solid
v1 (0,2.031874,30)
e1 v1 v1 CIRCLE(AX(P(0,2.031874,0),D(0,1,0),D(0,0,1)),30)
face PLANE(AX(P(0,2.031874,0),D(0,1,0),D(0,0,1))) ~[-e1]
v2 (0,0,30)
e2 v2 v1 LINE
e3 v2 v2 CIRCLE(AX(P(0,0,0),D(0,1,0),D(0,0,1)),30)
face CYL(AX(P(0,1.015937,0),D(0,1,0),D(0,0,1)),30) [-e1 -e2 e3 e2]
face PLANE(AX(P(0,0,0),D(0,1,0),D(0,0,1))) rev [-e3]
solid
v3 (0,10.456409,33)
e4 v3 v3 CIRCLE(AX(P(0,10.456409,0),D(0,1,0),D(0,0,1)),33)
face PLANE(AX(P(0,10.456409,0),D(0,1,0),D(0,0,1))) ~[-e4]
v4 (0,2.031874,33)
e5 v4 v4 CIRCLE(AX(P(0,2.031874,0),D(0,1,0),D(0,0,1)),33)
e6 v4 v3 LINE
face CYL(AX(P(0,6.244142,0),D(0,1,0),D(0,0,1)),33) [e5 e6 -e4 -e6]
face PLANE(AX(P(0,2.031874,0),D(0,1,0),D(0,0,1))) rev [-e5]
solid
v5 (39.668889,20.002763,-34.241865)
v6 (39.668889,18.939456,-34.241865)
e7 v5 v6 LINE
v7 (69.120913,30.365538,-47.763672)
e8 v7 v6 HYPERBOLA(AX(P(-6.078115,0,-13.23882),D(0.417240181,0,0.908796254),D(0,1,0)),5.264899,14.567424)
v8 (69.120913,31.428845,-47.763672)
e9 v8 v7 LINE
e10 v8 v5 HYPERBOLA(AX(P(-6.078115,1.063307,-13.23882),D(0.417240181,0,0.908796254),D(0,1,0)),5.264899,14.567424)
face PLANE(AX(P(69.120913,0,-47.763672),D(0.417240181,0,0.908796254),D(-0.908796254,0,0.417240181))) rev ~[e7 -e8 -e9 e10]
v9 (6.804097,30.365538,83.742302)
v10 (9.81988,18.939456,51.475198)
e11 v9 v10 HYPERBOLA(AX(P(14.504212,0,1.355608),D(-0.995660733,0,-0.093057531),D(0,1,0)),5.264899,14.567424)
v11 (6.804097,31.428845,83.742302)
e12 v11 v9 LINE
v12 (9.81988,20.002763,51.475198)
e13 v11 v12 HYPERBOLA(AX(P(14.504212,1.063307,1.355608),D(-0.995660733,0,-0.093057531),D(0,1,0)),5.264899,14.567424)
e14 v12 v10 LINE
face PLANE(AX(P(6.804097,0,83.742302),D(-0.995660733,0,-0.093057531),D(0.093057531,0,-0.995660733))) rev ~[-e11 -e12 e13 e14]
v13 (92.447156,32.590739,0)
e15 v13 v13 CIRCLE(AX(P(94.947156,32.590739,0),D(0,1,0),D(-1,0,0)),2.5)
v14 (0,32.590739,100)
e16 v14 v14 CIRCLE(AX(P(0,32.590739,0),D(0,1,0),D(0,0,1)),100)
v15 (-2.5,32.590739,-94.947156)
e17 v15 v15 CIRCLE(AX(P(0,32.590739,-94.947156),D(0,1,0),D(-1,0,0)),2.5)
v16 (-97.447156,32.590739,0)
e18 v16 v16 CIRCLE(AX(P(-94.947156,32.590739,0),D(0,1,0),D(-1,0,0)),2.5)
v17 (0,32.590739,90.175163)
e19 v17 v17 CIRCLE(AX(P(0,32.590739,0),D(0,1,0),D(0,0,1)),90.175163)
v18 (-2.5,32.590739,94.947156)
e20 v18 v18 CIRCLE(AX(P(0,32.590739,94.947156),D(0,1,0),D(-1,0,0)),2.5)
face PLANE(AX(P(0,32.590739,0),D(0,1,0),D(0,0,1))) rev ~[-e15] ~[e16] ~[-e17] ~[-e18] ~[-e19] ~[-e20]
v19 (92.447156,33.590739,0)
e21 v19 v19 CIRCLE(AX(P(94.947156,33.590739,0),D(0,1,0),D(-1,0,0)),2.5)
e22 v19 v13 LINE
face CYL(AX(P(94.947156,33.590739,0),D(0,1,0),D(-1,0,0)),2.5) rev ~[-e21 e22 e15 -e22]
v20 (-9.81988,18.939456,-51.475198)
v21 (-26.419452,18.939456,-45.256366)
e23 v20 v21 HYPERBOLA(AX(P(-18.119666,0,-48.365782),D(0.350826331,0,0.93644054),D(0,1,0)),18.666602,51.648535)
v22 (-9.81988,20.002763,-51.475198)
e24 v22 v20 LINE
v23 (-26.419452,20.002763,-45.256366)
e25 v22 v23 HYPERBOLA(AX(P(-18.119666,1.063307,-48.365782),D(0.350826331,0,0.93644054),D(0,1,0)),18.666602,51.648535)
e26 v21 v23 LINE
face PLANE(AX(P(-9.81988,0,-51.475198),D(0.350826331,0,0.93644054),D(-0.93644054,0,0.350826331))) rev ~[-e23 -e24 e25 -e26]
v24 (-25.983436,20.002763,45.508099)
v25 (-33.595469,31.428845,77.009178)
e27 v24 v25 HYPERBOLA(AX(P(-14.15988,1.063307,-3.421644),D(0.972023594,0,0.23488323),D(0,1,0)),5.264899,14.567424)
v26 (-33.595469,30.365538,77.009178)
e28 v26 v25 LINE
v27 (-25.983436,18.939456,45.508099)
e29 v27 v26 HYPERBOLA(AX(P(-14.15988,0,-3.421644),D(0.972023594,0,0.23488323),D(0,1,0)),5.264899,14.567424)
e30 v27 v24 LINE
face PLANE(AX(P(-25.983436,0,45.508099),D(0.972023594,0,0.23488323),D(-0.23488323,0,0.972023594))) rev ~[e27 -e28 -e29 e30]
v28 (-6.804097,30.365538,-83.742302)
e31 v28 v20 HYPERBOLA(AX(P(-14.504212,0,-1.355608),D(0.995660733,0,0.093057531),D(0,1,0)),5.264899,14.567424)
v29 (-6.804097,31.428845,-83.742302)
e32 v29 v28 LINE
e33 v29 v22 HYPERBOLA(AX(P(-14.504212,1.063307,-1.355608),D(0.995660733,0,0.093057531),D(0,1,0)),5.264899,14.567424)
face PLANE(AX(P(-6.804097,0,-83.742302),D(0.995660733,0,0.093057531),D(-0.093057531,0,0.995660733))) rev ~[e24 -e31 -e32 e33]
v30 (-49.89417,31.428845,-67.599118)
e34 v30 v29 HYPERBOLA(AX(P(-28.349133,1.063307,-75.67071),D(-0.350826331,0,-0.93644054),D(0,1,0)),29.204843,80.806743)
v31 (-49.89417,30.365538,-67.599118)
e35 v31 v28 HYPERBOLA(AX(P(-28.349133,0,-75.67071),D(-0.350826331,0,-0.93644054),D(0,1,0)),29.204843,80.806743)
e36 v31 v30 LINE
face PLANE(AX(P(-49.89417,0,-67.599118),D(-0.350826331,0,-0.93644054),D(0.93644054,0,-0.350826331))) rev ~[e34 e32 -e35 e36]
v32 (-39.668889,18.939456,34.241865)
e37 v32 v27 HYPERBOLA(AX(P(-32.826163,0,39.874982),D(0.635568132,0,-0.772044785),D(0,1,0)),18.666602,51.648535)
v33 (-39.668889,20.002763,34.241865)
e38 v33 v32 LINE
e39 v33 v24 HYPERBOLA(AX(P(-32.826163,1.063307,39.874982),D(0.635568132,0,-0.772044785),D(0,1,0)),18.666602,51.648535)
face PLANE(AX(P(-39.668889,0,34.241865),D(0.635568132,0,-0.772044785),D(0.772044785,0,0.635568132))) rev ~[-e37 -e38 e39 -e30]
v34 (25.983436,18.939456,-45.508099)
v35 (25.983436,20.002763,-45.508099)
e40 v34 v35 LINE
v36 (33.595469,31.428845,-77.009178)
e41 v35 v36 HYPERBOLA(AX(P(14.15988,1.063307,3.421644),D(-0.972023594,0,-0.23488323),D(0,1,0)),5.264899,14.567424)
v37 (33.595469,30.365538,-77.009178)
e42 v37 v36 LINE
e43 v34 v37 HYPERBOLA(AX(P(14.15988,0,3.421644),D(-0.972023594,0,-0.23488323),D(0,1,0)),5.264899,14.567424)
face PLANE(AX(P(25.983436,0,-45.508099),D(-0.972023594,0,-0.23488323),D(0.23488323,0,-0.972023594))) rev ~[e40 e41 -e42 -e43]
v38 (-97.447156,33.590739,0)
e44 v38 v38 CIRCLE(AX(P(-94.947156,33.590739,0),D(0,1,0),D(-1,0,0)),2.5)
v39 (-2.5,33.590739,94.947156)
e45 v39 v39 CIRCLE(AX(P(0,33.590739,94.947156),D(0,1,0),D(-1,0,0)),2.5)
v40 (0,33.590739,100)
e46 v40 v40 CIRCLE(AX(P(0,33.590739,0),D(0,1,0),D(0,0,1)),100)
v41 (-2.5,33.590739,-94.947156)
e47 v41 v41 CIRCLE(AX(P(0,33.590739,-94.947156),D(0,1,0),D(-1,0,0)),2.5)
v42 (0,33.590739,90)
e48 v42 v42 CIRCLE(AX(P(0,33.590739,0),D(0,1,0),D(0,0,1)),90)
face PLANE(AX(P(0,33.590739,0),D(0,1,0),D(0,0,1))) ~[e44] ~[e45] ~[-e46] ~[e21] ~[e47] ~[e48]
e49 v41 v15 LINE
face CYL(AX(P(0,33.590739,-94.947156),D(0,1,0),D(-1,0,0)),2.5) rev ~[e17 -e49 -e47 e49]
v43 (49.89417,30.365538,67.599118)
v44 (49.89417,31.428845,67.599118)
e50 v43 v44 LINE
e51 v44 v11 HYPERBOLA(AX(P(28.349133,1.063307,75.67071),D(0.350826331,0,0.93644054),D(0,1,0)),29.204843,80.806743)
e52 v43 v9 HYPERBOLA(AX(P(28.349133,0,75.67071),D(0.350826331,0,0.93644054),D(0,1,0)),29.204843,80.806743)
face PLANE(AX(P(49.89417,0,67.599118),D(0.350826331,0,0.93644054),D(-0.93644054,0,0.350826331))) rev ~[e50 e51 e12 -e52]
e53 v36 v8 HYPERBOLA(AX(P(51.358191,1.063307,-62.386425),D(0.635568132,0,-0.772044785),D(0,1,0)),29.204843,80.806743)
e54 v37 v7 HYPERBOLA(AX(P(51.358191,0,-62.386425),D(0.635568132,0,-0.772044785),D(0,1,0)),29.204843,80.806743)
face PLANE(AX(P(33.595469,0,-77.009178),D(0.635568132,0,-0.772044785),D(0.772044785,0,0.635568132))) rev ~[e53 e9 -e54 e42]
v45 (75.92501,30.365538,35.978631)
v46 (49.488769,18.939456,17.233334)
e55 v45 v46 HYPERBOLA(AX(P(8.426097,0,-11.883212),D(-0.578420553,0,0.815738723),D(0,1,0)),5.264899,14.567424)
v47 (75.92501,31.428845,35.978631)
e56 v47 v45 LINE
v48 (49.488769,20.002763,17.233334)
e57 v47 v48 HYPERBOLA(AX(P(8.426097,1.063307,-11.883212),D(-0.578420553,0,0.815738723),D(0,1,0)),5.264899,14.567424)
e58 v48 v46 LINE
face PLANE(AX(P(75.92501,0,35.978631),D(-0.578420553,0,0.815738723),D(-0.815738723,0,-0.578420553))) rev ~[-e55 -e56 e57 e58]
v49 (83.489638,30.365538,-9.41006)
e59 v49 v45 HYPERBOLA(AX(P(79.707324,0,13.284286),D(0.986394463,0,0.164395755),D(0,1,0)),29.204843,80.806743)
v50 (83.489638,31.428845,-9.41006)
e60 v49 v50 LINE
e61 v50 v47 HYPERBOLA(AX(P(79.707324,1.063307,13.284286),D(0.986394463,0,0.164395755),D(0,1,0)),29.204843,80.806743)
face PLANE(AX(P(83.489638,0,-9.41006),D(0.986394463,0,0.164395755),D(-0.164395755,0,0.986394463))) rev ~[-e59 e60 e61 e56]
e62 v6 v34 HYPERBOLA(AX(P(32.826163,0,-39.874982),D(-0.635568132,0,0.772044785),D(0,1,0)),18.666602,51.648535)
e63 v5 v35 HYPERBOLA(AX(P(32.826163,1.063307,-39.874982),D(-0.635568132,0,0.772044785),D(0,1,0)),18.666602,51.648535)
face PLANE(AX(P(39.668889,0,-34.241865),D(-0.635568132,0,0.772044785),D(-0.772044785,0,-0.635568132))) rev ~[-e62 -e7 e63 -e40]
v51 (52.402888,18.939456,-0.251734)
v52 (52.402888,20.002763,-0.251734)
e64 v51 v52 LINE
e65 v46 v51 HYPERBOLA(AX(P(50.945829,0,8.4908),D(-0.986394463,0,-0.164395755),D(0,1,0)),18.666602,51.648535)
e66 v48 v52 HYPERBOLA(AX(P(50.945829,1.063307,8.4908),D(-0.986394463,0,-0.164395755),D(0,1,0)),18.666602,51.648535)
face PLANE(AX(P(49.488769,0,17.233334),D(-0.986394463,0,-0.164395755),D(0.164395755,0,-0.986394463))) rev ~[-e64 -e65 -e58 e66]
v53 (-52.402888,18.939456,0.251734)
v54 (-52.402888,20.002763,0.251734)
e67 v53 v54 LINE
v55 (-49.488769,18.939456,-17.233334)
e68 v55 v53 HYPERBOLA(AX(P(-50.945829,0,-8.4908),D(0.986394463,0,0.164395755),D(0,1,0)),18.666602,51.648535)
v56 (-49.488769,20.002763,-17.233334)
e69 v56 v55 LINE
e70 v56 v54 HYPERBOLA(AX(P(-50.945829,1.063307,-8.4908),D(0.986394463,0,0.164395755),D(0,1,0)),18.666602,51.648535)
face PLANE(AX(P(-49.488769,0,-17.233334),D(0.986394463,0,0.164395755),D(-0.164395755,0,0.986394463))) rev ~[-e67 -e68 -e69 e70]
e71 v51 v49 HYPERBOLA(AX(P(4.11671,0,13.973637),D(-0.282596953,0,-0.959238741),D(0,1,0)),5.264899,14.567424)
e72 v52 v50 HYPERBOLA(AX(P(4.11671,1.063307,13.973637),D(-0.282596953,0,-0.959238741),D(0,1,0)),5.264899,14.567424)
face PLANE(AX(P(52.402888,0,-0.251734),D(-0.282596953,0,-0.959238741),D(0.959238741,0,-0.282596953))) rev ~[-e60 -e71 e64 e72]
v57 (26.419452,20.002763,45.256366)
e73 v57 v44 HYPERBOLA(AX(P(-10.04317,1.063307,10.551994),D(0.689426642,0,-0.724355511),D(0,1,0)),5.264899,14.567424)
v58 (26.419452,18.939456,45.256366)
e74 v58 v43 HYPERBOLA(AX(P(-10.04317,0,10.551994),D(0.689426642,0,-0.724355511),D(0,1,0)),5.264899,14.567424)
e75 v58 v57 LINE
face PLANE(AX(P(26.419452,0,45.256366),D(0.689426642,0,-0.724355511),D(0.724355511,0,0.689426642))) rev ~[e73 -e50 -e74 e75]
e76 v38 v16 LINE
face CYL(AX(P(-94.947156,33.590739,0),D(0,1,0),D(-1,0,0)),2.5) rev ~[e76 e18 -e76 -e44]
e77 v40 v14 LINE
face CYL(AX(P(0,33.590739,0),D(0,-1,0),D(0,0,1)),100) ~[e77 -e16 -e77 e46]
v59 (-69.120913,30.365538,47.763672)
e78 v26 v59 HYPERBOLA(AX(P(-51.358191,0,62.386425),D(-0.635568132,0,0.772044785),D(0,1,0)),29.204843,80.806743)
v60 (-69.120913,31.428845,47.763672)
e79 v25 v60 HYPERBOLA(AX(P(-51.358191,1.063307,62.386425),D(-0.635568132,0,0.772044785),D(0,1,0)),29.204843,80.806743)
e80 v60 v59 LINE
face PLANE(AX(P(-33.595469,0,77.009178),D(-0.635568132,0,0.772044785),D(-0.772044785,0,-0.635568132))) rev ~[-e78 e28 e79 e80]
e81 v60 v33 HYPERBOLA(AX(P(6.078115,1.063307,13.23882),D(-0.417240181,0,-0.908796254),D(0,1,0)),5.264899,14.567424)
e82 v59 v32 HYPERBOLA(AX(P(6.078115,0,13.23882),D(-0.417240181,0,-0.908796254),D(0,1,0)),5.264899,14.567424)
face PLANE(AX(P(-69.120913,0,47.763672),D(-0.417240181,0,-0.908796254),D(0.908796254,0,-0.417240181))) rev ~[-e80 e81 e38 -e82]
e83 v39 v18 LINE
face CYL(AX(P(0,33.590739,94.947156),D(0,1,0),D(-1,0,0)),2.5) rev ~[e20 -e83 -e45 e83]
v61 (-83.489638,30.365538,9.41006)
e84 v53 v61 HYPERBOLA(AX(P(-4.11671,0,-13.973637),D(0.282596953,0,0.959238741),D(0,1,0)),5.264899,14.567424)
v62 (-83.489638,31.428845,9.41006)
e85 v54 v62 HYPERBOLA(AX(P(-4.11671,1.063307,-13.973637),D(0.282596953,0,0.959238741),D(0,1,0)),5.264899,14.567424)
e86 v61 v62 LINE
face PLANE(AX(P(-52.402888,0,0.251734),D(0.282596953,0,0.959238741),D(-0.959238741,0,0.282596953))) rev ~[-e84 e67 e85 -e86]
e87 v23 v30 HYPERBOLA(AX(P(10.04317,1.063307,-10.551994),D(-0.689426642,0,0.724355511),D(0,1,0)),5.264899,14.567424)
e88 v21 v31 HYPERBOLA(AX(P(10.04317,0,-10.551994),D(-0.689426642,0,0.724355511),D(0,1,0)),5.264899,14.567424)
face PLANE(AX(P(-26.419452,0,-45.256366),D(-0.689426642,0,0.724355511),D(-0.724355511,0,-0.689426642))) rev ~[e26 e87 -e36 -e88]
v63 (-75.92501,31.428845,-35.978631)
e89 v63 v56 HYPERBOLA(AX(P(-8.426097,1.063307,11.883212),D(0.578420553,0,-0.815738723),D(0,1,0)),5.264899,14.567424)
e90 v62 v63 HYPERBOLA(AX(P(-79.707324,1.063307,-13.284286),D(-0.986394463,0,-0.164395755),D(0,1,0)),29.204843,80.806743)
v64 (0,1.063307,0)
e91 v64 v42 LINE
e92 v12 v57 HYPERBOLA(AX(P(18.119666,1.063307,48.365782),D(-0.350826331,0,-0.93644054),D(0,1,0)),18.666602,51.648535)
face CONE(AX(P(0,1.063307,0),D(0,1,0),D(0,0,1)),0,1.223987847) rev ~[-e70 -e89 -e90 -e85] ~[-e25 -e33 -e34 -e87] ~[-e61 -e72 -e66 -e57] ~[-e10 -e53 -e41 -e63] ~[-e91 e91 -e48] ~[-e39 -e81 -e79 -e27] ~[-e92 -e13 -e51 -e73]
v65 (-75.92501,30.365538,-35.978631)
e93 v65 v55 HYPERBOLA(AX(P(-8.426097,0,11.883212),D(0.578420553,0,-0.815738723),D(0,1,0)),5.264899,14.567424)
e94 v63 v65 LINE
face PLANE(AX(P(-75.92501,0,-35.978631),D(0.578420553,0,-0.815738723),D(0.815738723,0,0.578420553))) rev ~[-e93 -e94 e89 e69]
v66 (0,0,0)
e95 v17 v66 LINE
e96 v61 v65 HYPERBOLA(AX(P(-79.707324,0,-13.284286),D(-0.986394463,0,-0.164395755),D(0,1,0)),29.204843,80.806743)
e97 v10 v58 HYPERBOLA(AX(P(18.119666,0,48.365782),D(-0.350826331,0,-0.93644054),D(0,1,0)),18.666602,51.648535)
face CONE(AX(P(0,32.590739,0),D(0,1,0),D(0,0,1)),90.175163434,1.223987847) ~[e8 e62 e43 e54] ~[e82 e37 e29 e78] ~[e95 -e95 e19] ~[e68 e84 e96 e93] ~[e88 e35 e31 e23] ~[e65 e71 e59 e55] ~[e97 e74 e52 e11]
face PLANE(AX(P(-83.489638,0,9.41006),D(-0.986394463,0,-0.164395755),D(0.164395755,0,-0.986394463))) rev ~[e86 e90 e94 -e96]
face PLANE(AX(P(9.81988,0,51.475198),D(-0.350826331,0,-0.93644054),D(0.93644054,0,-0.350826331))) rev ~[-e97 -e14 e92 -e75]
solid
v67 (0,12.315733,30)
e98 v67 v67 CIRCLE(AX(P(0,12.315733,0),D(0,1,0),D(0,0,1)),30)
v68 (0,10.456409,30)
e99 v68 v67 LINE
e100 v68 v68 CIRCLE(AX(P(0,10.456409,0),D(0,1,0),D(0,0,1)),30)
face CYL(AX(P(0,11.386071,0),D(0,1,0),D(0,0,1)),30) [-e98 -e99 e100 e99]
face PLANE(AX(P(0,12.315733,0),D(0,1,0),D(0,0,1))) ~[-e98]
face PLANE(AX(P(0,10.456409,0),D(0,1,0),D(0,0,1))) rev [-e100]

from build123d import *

# Parameters (mm, degrees)
F0_W          = 2.0318743463
F0_H          = 30
F0_W_2        = 1.8593237499
F2_W          = 8.4245346444
F2_H          = 33
F9_DEPTH      = 135
F9_DEPTH_BACK = 304
F10_COUNT     = 6
F12_R         = 2.5
F13_DEPTH     = 33.5917390977


# Not quite as in the source:
# - the program builds the solid bodies; features that only make, move or delete a surface that nothing else refers to are left out


with BuildPart() as f1:
    # F0 (on Right) → F1 (revolve)
    with BuildSketch(Plane.YZ):
        with Locations((1.0159371731, 15)):
            Rectangle(F0_W, F0_H)
    revolve(axis=Axis((0, 1.0159371731, 0), (0, 1, 0)))


with BuildPart() as f1b:
    # F0 (on Right) → F1, piece 2 (revolve)
    with BuildSketch(Plane.YZ):
        with Locations((11.3860708656, 15)):
            Rectangle(F0_W_2, F0_H)
    revolve(axis=Axis((0, 1.0159371731, 0), (0, 1, 0)))


with BuildPart() as f3:
    # F2 (on Right) → F3 (revolve)
    with BuildSketch(Plane.YZ):
        with Locations((6.2441416685, 16.5)):
            Rectangle(F2_W, F2_H)
    revolve(axis=Axis((0, 6.2441416685, 0), (0, 1, 0)))


with BuildPart() as f7:
    # F6 (on Right) → F7 (revolve)
    with BuildSketch(Plane.YZ):
        Polygon((0, 0), (1.0633068526, 0), (33.5907390977, 90), (33.5907390977, 100), (32.5907390977, 100), (32.5907390977, 90.1751634341), align=None)
    revolve(axis=Axis((0, 47.4777109921, 0), (0, 1, 0)))


with BuildPart() as f9:
    # F8 (on Front) → F9 (new body, two sides)
    with BuildSketch(Plane.XZ) as f9_sk:
        Polygon((-33.5954686136, 77.0091775446), (-69.1209128956, 47.7636717384), (-39.6688894061, 34.2418646839), (-25.9834363433, 45.5080994937), align=None)
    extrude(amount=F9_DEPTH)
    extrude(f9_sk.sketch, amount=-F9_DEPTH_BACK)


with BuildPart() as f10_1:
    # F10: instance of F9
    add(f9.part.rotate(Axis((0, 11.3860708656, 0), (0, 1, 0)), 1 * 360 / F10_COUNT))


with BuildPart() as f10_2:
    # F10: instance of F9
    add(f9.part.rotate(Axis((0, 11.3860708656, 0), (0, 1, 0)), 2 * 360 / F10_COUNT))


with BuildPart() as f10_3:
    # F10: instance of F9
    add(f9.part.rotate(Axis((0, 11.3860708656, 0), (0, 1, 0)), 3 * 360 / F10_COUNT))


with BuildPart() as f10_4:
    # F10: instance of F9
    add(f9.part.rotate(Axis((0, 11.3860708656, 0), (0, 1, 0)), 4 * 360 / F10_COUNT))


with BuildPart() as f10_5:
    # F10: instance of F9
    add(f9.part.rotate(Axis((0, 11.3860708656, 0), (0, 1, 0)), 5 * 360 / F10_COUNT))


with BuildPart() as f7_1:
    add(f7.part)

    # F11: cut F10_1, F9, F10_5, F10_4, F10_3, F10_2
    add(f10_1.part, mode=Mode.SUBTRACT)
    add(f9.part, mode=Mode.SUBTRACT)
    add(f10_5.part, mode=Mode.SUBTRACT)
    add(f10_4.part, mode=Mode.SUBTRACT)
    add(f10_3.part, mode=Mode.SUBTRACT)
    add(f10_2.part, mode=Mode.SUBTRACT)

    # F12 (on face) → F13 (cut, through all)
    with BuildSketch(Plane(origin=(0, 33.5907390977, 0), x_dir=(-1, 0, 0), z_dir=(0, 1, 0))):
        with Locations((94.9471559662, 0)):
            Circle(F12_R)
        with Locations((-94.9471559662, 0)):
            Circle(F12_R)
        with Locations((0, -94.9471559662)):
            Circle(F12_R)
        with Locations((0, 94.9471559662)):
            Circle(F12_R)
    extrude(amount=-F13_DEPTH, mode=Mode.SUBTRACT)


solid = Compound([f1.part, f1b.part, f3.part, f7_1.part])
